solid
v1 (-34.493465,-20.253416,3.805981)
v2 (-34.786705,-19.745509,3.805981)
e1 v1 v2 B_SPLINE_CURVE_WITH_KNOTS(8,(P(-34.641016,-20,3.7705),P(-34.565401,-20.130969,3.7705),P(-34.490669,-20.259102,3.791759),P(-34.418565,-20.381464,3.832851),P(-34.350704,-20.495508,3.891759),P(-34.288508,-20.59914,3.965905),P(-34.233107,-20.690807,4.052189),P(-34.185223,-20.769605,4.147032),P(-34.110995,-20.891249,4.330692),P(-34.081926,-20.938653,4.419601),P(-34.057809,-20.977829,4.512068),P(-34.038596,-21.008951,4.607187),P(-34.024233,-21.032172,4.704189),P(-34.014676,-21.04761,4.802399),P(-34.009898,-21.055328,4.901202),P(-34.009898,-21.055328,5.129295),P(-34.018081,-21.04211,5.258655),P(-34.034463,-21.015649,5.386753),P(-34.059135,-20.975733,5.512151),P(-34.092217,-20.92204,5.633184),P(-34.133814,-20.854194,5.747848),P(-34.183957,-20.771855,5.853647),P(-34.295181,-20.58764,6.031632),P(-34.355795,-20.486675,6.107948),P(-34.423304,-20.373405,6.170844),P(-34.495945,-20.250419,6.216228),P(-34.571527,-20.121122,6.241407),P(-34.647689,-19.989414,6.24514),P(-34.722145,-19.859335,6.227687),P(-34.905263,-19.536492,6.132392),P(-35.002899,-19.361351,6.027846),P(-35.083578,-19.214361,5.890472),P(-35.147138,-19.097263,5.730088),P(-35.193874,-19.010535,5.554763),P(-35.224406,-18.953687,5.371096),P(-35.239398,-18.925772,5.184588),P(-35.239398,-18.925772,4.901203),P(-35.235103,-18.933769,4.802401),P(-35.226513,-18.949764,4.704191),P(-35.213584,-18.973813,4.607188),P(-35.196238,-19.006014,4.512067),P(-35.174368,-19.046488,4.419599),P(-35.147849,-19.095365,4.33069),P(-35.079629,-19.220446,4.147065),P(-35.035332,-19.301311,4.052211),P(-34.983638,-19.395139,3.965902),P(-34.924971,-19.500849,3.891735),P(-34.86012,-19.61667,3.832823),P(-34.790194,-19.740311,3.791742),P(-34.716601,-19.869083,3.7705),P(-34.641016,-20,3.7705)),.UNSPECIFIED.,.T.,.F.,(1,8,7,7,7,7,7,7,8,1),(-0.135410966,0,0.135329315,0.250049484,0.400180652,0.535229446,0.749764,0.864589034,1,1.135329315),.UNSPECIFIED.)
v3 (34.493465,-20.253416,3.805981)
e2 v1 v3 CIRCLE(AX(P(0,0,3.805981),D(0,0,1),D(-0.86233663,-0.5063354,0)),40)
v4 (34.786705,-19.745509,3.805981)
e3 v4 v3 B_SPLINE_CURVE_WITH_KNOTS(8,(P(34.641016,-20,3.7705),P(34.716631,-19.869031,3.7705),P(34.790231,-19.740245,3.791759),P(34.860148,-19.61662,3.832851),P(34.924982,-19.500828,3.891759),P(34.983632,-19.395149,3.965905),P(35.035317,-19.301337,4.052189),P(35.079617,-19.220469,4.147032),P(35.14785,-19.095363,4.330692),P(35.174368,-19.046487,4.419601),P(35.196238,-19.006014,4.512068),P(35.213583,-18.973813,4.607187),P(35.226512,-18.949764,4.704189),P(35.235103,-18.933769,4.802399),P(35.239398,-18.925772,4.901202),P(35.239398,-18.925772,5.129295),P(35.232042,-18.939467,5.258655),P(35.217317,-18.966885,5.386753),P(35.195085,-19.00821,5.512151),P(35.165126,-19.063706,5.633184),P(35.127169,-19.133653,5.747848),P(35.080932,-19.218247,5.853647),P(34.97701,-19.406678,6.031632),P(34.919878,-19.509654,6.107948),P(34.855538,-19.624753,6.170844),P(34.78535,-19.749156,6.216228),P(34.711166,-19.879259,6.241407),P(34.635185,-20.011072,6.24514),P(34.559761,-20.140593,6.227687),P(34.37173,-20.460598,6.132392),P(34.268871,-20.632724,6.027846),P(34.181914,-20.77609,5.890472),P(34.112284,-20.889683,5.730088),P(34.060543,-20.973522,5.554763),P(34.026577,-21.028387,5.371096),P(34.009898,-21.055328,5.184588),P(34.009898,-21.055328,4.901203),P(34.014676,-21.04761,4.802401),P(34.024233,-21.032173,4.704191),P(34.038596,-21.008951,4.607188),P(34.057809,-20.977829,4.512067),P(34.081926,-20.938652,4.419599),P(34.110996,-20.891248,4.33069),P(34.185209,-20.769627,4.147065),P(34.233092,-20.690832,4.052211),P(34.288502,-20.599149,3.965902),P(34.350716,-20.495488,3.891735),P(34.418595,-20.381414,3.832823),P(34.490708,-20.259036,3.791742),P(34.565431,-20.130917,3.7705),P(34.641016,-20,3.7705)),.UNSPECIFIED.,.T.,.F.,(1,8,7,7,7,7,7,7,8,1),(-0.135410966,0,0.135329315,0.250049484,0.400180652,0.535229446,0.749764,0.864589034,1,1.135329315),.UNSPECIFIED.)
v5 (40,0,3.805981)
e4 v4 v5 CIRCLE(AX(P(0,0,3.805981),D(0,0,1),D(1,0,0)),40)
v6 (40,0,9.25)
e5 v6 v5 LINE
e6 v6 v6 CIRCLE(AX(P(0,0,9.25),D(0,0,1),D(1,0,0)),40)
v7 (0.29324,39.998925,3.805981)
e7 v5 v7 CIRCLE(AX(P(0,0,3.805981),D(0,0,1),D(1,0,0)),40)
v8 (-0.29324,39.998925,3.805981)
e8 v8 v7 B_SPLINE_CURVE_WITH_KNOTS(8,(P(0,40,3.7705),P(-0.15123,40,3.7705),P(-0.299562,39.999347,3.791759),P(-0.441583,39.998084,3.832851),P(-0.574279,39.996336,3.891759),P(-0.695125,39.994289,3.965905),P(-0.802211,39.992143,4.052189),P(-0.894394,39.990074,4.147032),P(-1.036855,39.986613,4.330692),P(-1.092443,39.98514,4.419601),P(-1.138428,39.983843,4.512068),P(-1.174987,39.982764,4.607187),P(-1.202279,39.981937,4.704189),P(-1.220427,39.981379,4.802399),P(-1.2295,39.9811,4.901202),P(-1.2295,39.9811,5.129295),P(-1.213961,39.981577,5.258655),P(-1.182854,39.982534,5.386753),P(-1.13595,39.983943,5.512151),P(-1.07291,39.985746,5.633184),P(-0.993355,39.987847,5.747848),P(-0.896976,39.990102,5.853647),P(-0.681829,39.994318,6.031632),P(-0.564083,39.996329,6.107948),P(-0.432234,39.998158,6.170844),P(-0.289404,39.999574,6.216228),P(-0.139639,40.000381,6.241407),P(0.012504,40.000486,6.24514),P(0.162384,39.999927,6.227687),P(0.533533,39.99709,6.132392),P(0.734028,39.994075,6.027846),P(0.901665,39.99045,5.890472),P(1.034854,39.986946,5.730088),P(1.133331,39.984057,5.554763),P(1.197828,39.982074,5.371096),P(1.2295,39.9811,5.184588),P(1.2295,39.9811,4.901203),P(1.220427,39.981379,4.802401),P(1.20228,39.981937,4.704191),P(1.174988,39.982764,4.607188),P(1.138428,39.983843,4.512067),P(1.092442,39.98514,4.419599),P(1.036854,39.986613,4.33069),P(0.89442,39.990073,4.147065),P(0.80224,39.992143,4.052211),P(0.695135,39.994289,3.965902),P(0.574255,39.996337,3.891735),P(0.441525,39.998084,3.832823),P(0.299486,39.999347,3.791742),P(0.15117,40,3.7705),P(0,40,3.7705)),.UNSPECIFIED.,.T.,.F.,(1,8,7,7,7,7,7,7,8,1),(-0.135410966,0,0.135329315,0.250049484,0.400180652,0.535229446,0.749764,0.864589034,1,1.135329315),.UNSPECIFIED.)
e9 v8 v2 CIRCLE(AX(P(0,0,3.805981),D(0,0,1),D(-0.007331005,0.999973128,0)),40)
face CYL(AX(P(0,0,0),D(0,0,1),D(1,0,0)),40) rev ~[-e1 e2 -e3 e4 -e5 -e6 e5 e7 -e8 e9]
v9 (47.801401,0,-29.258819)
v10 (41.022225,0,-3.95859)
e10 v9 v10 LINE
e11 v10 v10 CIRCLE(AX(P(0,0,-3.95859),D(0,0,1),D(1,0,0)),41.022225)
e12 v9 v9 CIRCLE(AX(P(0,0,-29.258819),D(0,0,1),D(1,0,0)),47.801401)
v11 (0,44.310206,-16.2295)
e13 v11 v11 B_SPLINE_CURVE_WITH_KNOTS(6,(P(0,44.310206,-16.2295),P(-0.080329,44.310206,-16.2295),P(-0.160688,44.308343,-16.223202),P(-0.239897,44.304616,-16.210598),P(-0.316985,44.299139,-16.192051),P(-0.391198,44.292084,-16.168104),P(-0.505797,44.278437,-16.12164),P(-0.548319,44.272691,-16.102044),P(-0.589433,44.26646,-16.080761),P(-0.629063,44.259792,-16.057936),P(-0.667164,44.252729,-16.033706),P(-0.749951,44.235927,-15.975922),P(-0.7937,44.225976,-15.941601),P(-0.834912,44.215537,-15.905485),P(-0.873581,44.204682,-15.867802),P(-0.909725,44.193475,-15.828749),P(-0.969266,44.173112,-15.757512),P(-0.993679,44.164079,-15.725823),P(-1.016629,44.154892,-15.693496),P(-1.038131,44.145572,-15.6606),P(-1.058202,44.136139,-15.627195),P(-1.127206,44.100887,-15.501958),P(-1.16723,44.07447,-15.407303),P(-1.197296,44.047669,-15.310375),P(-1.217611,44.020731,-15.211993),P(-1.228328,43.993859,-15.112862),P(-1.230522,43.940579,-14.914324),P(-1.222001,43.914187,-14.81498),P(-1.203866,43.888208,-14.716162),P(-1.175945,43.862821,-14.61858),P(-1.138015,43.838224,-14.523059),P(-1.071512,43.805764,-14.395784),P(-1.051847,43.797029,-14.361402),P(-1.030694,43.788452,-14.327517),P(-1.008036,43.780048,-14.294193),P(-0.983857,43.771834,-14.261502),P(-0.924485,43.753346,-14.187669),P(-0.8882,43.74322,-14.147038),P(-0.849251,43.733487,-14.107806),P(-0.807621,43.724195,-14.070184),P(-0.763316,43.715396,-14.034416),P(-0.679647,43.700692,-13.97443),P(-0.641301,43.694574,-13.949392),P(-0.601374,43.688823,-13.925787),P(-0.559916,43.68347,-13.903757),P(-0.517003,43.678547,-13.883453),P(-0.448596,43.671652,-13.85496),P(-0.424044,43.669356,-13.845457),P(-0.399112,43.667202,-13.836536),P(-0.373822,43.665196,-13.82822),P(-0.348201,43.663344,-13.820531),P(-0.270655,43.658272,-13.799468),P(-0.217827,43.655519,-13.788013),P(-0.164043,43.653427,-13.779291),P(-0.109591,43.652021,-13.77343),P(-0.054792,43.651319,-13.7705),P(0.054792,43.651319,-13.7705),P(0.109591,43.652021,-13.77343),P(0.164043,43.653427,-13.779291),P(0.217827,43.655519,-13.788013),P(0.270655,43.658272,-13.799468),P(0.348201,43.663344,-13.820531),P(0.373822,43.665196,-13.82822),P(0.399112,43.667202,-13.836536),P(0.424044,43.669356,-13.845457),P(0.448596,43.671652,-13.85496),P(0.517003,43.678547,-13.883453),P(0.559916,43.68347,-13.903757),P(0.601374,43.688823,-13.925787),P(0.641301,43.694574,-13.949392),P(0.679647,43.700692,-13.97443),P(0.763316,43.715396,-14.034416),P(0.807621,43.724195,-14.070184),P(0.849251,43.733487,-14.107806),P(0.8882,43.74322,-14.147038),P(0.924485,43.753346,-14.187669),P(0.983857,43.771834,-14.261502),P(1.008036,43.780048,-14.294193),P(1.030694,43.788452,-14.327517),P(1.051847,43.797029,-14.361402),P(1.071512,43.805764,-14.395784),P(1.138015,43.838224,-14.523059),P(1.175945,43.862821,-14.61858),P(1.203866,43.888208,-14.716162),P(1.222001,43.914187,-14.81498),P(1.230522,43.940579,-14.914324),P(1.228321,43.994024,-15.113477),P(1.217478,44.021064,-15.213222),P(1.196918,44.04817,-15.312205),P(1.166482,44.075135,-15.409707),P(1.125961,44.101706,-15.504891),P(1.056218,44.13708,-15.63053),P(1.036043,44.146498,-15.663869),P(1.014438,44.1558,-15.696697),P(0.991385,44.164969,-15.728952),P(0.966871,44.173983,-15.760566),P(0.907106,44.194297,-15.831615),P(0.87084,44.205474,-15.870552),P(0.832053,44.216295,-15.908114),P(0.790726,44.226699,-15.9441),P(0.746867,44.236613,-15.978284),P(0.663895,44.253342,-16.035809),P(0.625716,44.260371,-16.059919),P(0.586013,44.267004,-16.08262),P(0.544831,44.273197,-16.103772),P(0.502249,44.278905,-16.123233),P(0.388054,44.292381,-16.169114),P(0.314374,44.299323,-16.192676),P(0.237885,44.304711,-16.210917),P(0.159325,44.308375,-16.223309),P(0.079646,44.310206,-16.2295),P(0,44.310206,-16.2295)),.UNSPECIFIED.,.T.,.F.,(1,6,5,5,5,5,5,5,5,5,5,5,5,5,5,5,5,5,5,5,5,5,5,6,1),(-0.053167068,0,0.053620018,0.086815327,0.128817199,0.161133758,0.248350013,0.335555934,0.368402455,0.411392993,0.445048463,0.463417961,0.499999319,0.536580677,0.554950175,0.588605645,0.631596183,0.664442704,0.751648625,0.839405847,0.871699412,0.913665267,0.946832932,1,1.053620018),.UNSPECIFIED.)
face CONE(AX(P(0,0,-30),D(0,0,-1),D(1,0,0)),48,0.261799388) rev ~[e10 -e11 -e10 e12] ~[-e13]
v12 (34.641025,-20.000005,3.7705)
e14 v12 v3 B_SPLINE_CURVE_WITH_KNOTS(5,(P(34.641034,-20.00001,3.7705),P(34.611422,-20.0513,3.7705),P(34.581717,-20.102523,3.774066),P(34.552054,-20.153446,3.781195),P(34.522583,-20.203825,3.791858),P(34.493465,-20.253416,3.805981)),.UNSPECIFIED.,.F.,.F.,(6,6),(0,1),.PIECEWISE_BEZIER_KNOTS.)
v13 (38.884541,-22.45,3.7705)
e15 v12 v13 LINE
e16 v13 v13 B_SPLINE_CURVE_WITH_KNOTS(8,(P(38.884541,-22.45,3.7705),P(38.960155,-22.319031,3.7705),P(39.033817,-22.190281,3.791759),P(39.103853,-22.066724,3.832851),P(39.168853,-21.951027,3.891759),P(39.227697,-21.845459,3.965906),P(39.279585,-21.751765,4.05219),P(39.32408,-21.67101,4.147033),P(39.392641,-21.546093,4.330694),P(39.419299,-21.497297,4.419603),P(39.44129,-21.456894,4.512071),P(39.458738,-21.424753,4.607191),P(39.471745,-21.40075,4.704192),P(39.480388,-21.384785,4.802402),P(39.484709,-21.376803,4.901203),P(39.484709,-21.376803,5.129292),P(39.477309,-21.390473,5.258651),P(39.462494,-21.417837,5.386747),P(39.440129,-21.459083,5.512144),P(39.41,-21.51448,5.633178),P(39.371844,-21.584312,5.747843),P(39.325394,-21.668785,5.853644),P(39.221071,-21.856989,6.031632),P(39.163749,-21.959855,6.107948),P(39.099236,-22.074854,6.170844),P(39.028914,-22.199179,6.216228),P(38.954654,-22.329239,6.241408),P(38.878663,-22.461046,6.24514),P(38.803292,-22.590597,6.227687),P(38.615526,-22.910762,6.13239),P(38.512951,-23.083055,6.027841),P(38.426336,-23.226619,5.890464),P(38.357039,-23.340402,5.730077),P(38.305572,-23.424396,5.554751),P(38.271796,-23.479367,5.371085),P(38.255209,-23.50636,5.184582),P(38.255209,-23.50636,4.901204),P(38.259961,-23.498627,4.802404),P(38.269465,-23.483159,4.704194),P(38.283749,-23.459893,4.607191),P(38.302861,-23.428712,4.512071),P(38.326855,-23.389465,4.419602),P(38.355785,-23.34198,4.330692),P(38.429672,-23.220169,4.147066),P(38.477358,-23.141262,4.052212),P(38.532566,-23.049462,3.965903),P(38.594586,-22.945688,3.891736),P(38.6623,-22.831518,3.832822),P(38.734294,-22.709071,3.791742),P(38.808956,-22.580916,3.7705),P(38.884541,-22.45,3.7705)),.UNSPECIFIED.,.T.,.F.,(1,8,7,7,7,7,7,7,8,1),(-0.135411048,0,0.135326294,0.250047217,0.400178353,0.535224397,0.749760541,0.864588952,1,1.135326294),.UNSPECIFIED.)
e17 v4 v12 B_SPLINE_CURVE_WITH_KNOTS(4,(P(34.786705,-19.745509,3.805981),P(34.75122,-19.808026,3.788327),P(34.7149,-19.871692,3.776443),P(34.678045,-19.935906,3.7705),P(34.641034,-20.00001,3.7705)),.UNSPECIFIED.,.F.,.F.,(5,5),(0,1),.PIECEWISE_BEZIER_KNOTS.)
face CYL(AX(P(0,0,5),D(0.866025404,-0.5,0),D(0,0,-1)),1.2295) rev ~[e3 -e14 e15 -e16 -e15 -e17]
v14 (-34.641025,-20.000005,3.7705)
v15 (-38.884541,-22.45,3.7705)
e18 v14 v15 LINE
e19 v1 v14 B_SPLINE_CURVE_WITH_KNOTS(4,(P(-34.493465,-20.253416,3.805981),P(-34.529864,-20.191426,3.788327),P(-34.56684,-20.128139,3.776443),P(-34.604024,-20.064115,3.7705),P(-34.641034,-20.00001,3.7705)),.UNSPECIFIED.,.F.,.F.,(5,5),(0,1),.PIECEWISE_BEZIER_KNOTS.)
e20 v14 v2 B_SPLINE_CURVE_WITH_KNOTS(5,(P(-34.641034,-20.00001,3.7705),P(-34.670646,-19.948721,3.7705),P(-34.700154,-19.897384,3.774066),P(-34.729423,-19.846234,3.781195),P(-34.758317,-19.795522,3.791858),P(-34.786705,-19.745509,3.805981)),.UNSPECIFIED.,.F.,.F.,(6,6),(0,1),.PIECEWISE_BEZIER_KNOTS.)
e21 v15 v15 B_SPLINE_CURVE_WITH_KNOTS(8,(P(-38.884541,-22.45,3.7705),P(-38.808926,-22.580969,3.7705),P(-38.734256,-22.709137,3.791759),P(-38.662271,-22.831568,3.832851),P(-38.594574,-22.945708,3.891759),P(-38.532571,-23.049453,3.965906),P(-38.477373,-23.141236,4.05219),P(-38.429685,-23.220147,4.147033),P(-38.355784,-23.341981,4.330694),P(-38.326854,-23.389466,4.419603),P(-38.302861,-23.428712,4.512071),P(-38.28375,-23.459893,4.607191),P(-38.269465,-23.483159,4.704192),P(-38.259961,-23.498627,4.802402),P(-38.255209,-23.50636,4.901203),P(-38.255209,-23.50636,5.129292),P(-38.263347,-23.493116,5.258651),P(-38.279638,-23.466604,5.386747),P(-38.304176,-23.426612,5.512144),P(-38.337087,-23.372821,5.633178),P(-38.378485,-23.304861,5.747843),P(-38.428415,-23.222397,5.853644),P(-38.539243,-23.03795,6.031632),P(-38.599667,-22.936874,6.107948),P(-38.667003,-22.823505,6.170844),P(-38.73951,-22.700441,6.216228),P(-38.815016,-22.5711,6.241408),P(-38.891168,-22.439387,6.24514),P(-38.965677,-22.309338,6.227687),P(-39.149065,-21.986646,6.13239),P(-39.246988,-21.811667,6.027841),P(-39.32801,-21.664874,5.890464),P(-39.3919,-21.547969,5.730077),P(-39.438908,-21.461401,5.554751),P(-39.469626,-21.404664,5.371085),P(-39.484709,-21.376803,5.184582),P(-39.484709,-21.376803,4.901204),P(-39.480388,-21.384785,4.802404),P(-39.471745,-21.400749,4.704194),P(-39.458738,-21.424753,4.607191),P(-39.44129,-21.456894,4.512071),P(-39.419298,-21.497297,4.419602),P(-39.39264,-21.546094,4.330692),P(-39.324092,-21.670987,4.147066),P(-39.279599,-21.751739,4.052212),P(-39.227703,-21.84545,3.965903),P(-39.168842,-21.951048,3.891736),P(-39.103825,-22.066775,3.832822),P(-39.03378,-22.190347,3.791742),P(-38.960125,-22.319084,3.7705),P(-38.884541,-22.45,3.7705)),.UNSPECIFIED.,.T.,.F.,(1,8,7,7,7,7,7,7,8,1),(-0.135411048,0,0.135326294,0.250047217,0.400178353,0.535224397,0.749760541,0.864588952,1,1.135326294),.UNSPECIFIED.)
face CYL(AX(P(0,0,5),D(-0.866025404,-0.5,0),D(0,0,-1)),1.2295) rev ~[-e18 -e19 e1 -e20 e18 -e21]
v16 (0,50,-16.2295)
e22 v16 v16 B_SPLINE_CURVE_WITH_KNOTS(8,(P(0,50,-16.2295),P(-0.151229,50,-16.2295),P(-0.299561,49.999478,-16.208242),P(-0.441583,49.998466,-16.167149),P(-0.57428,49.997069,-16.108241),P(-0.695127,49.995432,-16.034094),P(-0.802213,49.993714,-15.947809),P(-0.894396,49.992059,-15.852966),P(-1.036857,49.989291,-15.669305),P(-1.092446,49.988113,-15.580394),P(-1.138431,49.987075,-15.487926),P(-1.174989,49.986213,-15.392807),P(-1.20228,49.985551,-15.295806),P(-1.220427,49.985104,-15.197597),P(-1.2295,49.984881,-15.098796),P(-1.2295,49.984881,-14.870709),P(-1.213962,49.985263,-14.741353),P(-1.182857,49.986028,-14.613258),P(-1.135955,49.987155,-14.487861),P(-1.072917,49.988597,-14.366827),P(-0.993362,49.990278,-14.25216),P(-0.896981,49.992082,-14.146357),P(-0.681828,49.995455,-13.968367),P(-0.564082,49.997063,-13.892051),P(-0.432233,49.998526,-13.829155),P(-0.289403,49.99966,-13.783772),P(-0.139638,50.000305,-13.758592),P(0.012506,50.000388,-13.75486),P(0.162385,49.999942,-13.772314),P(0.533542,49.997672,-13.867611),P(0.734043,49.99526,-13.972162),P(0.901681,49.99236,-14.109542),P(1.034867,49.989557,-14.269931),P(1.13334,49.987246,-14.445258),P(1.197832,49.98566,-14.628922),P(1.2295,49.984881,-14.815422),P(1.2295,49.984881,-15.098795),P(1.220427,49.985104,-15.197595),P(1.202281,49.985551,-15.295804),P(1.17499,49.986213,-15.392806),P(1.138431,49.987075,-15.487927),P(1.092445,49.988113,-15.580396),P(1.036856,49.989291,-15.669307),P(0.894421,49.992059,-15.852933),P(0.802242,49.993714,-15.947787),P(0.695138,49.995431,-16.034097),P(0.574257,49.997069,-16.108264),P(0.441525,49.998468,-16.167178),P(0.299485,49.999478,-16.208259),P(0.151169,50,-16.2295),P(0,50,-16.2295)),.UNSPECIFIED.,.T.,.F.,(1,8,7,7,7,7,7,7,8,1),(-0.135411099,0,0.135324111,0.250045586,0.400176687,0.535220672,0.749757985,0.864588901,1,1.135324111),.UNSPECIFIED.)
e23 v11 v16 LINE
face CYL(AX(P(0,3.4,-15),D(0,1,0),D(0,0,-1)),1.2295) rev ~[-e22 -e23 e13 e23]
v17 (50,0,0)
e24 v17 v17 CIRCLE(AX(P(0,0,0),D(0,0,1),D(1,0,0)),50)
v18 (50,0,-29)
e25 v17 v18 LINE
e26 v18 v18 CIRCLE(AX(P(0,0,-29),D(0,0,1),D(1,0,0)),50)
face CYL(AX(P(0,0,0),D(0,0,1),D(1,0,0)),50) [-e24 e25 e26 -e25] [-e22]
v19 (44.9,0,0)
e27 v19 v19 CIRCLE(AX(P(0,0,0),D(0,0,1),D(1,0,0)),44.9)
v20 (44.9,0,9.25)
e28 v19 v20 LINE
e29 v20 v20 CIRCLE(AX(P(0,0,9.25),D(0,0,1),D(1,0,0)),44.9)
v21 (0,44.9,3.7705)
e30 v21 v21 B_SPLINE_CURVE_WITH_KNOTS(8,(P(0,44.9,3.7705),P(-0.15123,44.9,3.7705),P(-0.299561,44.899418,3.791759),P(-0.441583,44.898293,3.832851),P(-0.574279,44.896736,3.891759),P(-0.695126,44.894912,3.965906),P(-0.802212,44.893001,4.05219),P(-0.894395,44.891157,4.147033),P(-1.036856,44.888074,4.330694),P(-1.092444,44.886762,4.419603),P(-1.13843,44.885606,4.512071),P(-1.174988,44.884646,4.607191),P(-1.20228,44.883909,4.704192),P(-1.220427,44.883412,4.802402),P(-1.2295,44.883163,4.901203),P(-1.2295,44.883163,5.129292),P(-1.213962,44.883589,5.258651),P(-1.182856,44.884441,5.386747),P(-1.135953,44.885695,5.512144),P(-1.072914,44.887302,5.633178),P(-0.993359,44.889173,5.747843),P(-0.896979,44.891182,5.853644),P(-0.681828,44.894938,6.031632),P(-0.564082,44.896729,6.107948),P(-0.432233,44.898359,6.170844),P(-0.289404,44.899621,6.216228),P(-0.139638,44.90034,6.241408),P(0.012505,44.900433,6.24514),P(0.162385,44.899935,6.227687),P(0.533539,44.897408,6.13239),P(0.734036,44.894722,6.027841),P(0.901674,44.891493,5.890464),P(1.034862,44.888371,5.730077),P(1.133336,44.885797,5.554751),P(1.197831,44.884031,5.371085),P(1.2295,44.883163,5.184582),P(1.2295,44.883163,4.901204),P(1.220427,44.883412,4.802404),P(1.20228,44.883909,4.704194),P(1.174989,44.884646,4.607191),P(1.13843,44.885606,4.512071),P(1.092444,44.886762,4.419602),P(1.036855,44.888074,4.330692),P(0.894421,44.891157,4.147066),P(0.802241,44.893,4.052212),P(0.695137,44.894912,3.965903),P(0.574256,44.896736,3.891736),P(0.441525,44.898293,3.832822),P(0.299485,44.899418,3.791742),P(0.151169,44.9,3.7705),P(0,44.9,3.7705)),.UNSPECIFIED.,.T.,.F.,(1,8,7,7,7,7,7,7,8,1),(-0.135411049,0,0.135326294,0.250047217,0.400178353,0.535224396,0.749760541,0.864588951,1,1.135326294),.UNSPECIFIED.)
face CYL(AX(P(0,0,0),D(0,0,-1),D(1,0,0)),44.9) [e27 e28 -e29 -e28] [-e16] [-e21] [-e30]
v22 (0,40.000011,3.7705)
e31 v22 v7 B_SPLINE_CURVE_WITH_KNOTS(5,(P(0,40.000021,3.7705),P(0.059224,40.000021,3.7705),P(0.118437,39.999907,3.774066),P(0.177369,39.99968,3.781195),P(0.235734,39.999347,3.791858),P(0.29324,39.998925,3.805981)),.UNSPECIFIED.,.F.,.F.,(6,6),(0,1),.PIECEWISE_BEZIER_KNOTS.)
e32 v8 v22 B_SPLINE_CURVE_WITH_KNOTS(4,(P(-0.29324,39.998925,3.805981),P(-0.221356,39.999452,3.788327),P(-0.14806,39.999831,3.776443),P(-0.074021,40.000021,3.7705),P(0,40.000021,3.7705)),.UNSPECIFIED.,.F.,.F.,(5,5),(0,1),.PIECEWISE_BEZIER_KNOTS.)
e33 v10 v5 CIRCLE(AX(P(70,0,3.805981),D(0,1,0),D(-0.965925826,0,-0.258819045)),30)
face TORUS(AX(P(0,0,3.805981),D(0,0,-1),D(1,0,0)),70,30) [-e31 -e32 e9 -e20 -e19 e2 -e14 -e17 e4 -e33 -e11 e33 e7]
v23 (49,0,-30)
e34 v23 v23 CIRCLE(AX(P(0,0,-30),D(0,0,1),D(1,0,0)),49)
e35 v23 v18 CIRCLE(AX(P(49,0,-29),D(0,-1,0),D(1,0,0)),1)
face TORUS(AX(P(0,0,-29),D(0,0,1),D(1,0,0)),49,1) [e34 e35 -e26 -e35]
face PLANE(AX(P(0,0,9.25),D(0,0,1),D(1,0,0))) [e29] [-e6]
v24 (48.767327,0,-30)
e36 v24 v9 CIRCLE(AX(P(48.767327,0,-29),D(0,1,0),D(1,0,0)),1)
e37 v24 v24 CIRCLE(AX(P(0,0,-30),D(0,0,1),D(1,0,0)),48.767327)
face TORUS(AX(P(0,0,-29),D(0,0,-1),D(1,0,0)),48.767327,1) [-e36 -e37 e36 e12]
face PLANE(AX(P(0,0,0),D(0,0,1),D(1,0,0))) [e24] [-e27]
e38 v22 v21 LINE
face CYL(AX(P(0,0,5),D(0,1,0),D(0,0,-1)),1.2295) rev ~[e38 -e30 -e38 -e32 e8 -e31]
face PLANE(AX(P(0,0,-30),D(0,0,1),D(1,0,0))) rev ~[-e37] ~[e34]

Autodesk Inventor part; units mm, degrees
ref_plane "YZ Plane" through (0, 0, 0) normal (1, 0, 0) x (0, 1, 0)
ref_plane "XZ Plane" through (0, 0, 0) normal (0, 1, 0) x (-1, 0, 0)
ref_plane "XY Plane" through (0, 0, 0) normal (0, 0, 1) x (1, 0, 0)
sketch "Sketch1" plane through (0, 0, 0) normal (0, 0, 1) x (1, 0, 0)
  circle A0 centre (0, 0) radius 40
  circle A1 centre (0, 0) radius 50
  dimension "d0" = 80
  dimension "d1" = 100
extrude "Extrusion1" add sketch "Sketch1" against normal blind 30
sketch "Sketch2" plane through (0, 0, 0) normal (0, 0, 1) x (1, 0, 0)
  circle A0 centre (0, 0) radius 44.9
  circle A1 centre (0, 0) radius 40 projected
  dimension "d4" = 89.8
extrude "Extrusion2" add sketch "Sketch2" along normal blind 9.25
sketch "Sketch3" plane through (0, 0, 0) normal (0, 1, 0) x (-1, 0, 0)
  point P0 (0, 0)
  point P1 (0, 5)
  dimension "d7" = 5
hole "Hole1" at (0, 0, 5) direction (0, 1, 0) diameter 2.459 end through all thread size "M3x0.5" class "6H" standard "ISO Metric profile"
pattern_circular "Circular Pattern1" count 3 over 360 about axis through (0, 0, -10) along (0, 0, 1) of "Hole1"
sketch "Sketch4" plane through (0, 0, 0) normal (0, 1, 0) x (-1, 0, 0)
  point P0 (0, -15)
  point P1 (0, 0)
  dimension "d23" = 15
hole "Hole2" at (0, 0, -15) direction (0, 1, 0) diameter 2.459 end through all counterbore diameter 6.5 counterbore depth 3.4 thread size "M3x0.5" class "6H" standard "ANSI Metric M Profile"
chamfer "Chamfer1" distance 8 angle 75 1 edges at (-40, 0, -30)
fillet "Fillet1" radius 30 1 edges at (-40, 0, -0.1436)
fillet "Fillet2" radius 1 2 edges at (-48, 0, -30) (-50, 0, -30)
properties part number "Tail"
